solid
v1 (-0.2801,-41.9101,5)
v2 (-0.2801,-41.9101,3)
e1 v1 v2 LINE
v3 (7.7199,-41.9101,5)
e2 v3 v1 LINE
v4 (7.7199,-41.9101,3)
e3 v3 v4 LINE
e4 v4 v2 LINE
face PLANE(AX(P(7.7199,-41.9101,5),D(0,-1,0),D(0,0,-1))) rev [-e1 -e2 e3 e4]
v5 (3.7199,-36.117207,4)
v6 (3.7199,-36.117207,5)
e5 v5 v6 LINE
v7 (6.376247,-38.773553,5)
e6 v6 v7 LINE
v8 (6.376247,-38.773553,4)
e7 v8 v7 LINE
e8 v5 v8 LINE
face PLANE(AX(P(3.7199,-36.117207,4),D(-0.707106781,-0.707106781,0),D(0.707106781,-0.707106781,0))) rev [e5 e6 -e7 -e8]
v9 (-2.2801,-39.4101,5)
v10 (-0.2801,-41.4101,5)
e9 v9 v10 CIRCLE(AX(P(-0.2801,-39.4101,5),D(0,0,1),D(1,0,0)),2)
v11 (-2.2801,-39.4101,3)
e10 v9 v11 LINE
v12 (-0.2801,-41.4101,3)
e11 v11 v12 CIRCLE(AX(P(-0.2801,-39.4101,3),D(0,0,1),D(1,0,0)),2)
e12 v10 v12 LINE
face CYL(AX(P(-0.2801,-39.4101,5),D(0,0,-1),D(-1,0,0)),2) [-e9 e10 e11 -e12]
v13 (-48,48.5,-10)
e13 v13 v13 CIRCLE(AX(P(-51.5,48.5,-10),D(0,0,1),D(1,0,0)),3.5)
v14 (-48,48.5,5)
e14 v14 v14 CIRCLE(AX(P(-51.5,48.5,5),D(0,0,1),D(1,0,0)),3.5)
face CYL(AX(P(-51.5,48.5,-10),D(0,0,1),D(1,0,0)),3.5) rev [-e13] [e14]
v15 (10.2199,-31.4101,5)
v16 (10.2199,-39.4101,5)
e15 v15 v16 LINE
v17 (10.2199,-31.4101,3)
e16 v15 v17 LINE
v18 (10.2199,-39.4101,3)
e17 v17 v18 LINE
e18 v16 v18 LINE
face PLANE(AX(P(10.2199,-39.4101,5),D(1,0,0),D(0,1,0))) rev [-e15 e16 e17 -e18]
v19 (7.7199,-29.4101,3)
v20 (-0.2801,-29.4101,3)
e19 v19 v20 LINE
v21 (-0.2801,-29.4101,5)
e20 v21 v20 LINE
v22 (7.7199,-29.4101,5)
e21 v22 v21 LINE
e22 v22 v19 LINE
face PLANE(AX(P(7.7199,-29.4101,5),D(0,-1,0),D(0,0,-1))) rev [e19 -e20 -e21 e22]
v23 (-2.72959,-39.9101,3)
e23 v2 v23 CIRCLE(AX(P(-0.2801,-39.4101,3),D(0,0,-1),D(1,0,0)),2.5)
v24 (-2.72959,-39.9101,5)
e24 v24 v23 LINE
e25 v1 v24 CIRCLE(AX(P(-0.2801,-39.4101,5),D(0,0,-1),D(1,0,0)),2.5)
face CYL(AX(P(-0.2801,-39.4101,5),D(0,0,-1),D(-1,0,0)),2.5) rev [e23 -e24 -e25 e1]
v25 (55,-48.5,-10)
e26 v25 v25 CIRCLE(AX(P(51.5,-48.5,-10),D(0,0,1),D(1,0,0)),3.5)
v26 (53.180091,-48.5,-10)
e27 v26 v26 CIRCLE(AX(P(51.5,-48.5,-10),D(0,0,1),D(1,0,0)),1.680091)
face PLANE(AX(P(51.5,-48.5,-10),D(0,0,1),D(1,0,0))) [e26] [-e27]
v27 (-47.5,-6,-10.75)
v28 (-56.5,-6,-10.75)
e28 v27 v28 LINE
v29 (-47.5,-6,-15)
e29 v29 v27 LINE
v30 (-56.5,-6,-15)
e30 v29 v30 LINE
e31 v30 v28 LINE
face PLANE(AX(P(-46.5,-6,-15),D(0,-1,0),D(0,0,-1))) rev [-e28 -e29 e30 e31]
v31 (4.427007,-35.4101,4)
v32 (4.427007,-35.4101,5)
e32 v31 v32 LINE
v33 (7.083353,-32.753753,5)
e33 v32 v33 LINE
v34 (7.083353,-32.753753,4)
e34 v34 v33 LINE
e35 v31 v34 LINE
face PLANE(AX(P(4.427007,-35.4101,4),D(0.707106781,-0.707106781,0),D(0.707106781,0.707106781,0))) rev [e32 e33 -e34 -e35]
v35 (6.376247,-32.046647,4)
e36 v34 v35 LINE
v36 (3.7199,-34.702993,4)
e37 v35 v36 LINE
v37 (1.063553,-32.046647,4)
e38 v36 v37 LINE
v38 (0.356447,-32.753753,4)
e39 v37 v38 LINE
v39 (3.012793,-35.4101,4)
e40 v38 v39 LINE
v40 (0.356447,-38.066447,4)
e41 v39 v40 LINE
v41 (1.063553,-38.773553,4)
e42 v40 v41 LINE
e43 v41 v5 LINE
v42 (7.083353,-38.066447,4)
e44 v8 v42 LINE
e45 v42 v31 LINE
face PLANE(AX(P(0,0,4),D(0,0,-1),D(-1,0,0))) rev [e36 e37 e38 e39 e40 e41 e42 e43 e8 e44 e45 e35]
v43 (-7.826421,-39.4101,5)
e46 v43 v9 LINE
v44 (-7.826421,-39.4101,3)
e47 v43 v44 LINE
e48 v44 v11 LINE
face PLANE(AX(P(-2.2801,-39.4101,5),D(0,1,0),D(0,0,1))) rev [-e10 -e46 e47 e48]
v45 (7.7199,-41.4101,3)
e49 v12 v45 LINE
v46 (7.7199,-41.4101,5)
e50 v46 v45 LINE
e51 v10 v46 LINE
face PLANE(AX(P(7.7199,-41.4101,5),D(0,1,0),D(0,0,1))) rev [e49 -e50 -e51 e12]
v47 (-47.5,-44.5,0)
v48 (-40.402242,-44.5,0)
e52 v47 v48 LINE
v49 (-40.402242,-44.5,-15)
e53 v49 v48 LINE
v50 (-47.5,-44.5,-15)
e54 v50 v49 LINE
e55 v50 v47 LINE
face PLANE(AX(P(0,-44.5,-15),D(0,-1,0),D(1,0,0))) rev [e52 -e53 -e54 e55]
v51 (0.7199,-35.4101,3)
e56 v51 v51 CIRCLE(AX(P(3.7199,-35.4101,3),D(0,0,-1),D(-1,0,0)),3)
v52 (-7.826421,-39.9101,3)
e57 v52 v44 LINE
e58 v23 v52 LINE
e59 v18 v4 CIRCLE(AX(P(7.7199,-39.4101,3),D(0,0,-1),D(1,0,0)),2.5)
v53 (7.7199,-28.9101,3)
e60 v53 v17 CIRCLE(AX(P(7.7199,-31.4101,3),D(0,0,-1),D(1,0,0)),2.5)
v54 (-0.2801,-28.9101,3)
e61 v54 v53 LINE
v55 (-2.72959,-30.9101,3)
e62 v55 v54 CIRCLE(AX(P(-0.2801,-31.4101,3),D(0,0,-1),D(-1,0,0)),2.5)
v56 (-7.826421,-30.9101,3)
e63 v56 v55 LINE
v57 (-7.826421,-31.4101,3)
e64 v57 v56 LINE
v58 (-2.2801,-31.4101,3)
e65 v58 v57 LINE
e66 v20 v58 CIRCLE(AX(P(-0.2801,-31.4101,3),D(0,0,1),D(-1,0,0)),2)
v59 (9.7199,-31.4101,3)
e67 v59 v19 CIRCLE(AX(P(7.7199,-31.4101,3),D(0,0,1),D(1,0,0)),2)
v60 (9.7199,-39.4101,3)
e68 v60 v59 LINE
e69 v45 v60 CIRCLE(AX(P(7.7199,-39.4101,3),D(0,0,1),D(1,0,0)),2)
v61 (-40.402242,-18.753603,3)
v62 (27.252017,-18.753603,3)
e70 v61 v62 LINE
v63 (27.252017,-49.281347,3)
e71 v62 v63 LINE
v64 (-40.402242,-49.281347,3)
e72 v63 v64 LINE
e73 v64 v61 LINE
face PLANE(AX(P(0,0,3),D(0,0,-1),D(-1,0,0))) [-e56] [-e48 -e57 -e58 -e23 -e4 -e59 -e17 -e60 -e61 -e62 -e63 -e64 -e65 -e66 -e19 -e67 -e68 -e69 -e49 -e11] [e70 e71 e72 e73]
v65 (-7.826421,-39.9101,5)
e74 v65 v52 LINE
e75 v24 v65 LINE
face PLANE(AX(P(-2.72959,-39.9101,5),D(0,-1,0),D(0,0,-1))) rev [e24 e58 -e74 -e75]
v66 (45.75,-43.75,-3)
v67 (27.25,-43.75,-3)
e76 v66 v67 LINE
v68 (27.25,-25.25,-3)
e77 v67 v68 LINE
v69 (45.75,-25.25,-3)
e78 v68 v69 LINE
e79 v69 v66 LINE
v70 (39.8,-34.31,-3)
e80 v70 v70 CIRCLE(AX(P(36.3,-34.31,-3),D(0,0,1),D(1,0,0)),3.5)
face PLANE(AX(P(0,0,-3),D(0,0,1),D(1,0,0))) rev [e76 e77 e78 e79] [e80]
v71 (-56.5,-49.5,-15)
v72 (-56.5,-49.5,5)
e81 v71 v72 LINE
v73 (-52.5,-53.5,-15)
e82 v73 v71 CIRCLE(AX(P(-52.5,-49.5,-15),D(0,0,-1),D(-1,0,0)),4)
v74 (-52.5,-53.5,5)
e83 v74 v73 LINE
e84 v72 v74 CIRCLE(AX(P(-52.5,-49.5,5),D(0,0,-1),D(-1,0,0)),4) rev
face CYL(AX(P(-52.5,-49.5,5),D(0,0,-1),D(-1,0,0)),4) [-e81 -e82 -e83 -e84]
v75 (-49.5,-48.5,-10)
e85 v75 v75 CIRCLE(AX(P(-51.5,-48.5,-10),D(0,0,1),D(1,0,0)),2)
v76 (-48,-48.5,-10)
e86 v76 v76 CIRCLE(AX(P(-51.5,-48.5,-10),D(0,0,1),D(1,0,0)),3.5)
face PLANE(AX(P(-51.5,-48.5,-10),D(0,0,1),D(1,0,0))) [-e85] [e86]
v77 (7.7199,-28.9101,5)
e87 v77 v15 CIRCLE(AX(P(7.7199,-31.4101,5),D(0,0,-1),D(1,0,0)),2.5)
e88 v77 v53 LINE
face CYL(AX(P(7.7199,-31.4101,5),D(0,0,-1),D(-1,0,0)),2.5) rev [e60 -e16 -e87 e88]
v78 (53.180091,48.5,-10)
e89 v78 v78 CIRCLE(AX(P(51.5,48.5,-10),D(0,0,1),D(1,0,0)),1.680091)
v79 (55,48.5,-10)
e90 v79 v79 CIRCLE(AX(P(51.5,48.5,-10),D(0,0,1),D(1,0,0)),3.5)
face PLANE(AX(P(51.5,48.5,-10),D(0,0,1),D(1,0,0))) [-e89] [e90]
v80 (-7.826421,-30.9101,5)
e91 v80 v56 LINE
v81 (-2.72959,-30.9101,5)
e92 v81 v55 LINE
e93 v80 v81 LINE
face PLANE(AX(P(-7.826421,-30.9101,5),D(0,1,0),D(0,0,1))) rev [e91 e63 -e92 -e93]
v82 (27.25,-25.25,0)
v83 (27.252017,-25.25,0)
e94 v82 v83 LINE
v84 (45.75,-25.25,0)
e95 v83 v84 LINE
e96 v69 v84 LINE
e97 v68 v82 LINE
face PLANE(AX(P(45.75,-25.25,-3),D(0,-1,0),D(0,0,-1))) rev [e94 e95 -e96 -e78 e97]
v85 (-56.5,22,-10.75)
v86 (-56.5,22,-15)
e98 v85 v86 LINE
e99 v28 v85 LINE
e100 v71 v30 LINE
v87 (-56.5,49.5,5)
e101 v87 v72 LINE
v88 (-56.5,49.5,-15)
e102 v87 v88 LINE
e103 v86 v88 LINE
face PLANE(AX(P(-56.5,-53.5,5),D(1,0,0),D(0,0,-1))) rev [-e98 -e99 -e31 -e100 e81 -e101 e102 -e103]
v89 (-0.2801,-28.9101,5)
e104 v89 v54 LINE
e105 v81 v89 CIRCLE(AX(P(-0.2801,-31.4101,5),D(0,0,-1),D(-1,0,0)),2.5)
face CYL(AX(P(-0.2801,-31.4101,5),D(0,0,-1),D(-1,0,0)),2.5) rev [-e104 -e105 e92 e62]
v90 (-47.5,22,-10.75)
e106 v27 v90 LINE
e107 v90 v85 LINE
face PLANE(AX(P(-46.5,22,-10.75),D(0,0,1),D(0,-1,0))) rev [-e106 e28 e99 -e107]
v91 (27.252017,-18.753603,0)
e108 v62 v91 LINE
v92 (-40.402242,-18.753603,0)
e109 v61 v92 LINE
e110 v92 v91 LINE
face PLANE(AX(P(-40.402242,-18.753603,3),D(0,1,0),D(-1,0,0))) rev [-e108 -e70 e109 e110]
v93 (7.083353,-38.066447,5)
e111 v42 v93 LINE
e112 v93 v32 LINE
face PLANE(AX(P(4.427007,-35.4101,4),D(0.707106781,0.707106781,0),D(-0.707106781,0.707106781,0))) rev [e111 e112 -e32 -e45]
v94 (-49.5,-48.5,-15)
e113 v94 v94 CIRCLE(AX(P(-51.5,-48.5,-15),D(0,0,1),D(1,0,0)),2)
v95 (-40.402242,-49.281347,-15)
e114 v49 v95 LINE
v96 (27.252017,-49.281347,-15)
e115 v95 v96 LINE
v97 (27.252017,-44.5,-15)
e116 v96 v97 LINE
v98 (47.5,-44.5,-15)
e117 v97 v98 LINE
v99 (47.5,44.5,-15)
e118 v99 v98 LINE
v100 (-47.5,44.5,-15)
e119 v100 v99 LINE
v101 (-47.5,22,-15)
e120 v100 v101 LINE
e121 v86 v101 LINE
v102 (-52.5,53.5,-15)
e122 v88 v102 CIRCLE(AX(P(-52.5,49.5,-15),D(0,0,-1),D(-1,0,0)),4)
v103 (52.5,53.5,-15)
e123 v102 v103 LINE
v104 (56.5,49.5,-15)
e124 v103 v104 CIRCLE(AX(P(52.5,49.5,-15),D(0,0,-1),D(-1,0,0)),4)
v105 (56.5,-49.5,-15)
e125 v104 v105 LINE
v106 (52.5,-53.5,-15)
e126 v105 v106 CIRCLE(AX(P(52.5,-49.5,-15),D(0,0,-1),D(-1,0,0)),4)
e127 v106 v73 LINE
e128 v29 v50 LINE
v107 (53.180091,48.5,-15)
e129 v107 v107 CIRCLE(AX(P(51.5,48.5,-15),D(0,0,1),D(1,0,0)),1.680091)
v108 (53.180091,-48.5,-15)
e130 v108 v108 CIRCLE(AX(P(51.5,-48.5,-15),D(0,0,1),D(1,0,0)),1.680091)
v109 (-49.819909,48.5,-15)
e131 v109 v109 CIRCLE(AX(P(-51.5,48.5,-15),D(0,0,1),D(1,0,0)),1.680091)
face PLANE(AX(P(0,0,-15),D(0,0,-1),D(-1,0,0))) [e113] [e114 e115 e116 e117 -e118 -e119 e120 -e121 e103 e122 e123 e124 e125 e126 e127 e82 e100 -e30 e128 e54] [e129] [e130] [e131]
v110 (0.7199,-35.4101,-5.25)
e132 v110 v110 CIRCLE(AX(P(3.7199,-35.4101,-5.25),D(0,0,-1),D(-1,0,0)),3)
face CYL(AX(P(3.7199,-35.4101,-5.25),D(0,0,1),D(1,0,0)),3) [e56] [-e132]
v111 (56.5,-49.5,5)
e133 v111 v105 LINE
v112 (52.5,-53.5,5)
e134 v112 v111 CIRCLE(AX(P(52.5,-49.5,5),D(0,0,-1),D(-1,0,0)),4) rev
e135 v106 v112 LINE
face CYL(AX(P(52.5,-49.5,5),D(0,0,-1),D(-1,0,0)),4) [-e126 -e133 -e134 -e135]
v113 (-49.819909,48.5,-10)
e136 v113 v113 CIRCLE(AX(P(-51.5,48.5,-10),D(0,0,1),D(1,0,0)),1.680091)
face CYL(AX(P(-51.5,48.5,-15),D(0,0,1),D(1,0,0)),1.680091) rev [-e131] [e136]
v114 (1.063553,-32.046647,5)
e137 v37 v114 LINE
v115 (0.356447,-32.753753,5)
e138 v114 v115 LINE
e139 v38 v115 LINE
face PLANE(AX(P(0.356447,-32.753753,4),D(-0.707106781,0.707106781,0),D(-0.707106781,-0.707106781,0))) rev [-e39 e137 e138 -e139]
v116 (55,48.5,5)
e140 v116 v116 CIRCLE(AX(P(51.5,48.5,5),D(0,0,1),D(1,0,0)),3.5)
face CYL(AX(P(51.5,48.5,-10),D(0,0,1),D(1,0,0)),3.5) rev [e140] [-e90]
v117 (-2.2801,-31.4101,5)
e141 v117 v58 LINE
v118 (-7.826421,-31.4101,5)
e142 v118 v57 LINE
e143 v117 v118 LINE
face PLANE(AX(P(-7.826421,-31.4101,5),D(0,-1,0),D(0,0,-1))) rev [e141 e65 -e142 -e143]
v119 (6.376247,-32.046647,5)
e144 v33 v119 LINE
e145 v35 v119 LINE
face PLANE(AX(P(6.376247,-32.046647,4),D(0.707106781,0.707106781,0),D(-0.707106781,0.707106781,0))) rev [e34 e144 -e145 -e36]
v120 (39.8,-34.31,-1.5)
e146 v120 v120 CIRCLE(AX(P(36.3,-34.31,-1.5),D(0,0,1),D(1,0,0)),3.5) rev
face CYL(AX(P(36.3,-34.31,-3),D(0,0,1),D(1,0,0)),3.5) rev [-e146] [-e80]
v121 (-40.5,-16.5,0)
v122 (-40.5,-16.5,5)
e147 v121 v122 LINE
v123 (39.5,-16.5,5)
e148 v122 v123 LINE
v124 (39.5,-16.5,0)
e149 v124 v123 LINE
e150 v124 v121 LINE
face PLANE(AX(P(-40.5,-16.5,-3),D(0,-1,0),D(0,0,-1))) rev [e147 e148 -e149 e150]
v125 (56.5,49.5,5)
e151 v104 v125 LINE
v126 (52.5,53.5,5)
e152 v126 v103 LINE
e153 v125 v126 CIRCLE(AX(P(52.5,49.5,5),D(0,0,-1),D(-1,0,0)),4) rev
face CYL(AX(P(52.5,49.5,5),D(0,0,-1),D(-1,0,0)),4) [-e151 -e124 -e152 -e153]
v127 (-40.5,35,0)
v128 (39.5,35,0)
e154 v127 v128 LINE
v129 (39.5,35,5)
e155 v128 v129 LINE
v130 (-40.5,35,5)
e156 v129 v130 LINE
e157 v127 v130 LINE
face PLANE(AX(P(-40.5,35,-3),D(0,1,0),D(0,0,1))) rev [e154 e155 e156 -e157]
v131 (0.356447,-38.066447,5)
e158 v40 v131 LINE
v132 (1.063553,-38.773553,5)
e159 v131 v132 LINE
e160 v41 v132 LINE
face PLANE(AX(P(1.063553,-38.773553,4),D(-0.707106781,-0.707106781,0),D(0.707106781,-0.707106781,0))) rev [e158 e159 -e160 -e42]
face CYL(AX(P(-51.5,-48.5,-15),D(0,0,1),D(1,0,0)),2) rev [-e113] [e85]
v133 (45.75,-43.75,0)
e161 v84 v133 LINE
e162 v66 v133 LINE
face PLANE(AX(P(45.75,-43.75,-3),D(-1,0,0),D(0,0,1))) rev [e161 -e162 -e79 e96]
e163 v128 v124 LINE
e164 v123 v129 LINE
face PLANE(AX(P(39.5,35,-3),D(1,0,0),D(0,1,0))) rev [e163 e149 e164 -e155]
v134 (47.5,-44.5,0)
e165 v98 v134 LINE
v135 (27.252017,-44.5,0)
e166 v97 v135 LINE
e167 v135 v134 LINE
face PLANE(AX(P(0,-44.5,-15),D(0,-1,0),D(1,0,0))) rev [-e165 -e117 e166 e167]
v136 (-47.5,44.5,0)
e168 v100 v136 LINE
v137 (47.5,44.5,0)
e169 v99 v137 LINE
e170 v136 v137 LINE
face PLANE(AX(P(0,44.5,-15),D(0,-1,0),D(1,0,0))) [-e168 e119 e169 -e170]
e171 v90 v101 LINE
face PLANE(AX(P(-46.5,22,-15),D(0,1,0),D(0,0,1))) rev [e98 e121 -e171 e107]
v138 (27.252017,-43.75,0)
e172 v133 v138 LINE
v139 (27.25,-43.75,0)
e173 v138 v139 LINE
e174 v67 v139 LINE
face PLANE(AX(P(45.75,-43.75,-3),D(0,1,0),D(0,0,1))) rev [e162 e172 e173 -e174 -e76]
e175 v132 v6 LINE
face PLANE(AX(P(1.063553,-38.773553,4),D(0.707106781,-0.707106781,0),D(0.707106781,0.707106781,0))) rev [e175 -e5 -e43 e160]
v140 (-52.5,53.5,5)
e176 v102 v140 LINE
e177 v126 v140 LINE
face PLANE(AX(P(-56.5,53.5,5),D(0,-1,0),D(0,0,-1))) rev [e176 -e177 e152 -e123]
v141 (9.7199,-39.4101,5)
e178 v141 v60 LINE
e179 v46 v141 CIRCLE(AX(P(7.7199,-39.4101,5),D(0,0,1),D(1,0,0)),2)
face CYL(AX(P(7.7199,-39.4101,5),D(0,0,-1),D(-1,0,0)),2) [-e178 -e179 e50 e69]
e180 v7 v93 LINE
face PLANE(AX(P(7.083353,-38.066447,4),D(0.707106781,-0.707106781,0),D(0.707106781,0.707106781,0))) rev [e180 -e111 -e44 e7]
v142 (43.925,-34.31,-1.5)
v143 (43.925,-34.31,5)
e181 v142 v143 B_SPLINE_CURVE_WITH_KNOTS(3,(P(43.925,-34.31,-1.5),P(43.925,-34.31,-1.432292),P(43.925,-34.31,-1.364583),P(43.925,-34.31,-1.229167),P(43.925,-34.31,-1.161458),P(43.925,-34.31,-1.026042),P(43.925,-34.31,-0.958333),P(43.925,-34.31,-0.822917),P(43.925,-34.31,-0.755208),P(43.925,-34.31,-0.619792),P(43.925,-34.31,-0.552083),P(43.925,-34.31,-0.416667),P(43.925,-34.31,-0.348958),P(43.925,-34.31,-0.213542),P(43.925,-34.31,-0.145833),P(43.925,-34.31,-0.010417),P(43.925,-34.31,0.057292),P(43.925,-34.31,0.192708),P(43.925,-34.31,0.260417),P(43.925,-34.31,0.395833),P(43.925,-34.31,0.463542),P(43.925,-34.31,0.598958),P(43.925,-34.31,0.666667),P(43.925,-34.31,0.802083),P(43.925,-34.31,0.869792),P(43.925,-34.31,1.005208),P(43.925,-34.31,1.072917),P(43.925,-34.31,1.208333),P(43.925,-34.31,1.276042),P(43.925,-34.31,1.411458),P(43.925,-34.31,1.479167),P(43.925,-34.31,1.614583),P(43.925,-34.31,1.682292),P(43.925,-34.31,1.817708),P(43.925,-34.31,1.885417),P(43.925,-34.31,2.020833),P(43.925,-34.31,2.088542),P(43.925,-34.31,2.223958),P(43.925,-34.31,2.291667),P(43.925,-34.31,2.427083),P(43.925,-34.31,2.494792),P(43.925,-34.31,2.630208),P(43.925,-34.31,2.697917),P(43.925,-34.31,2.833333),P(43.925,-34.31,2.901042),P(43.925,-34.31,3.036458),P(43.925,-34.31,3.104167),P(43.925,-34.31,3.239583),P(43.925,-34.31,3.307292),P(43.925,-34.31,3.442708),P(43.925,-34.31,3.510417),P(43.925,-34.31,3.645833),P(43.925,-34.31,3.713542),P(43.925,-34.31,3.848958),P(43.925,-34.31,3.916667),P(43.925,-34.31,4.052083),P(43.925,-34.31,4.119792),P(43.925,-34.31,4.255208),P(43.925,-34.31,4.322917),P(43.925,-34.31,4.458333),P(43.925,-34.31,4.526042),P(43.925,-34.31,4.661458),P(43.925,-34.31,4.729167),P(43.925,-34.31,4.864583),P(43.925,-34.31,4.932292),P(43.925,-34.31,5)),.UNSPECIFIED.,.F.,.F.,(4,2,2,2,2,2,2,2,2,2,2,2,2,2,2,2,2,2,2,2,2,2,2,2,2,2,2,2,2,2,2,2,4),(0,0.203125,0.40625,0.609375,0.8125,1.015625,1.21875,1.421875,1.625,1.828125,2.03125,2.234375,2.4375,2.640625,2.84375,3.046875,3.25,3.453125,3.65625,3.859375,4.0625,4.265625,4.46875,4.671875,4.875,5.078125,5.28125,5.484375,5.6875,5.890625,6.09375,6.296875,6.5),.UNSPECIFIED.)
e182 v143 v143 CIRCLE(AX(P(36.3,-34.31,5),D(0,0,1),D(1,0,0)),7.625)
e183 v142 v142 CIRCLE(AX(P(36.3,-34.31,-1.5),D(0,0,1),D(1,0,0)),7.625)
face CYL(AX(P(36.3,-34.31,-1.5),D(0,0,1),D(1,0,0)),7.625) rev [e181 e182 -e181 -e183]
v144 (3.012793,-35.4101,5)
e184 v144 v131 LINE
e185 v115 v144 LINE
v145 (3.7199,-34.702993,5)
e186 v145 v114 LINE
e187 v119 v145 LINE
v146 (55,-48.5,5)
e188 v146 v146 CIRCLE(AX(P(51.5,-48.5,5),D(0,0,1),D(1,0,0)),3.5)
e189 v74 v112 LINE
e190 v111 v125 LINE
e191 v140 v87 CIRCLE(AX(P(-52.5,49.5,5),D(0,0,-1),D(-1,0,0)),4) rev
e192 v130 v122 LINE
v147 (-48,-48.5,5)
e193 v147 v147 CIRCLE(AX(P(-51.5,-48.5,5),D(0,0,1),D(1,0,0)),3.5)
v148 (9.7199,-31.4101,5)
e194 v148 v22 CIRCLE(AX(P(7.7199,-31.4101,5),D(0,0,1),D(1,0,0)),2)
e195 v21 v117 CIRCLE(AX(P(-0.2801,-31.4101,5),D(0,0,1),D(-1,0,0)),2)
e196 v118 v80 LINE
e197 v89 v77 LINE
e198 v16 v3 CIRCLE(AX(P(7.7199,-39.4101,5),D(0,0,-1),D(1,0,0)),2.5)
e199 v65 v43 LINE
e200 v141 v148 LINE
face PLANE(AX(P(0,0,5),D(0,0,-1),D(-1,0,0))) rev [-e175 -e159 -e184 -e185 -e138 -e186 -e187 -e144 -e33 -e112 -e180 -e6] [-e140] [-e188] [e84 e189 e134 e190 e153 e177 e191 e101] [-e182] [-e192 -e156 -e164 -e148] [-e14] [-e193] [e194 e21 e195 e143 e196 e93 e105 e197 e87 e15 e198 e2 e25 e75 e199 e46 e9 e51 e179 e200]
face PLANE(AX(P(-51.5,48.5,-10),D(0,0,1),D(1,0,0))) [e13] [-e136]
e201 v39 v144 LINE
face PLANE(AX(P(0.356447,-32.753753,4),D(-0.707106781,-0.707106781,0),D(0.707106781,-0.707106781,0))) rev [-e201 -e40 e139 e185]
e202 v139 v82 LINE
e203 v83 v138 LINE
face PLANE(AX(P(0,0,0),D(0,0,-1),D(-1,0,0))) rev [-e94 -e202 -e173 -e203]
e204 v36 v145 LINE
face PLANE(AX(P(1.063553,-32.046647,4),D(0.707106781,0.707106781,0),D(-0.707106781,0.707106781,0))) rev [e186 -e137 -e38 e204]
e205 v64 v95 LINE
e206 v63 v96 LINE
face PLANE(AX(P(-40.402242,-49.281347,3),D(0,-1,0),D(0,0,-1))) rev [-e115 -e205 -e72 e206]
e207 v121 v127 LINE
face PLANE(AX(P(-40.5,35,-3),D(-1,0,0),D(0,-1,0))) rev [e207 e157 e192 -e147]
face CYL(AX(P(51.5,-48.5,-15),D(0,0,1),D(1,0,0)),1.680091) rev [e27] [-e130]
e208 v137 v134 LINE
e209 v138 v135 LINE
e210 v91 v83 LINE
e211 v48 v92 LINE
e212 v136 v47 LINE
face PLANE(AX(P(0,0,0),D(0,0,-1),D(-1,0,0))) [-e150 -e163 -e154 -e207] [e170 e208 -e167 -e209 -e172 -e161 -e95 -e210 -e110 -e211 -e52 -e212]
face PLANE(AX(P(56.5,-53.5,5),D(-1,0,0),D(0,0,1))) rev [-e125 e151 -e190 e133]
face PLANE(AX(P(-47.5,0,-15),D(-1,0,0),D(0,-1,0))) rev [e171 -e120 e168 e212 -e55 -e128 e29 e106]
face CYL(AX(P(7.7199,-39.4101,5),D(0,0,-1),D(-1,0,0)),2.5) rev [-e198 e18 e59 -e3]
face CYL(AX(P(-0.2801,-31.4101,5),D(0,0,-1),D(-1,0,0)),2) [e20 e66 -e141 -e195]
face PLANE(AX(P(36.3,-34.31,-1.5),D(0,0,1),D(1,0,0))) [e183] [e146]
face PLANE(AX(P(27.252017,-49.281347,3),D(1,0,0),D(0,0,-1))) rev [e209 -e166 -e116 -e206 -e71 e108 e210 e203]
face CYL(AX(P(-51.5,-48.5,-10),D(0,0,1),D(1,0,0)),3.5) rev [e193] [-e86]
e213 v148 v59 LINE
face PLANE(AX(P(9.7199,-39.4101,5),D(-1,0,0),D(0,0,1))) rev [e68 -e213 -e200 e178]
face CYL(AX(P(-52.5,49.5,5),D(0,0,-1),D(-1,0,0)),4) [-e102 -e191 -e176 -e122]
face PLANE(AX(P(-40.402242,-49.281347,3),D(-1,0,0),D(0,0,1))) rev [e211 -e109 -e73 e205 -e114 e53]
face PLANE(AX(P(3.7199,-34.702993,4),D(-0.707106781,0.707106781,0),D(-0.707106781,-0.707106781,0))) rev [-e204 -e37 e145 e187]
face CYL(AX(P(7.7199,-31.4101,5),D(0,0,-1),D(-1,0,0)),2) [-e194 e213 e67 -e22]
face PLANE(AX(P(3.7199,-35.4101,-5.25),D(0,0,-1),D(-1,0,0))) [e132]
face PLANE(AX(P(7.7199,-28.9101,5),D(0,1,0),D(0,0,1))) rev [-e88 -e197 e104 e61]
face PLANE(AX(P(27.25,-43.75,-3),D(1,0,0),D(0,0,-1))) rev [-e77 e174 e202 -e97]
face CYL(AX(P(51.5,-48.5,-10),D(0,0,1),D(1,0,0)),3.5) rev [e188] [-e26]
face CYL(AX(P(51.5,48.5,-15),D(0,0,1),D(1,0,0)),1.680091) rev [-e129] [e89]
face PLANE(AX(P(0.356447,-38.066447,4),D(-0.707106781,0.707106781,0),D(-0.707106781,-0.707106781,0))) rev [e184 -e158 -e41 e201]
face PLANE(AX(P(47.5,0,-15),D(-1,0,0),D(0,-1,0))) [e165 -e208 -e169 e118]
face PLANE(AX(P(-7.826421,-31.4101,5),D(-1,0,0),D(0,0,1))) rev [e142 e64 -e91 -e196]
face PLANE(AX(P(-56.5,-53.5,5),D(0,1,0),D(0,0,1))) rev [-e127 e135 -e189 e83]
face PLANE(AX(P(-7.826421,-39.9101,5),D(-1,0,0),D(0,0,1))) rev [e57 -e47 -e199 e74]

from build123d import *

# Parameters (mm, degrees)
SKETCH1_W                        = 113
SKETCH1_H                        = 107
MAIN_BODY_DEPTH                  = 5
SKETCH19_W                       = 18.5
SKETCH19_H                       = 18.5
BOSS_EXTRUDE1_DEPTH              = 3
SKETCH7_R                        = 3.5
SKETCH7_W                        = 80
SKETCH7_H                        = 51.5
SCREEN_AND_KNOB_LOCATATION_DEPTH = 79.220841213
SKETCH11_W                       = 67.654258951
SKETCH11_H                       = 30.527744354
INTERNAL_CAVITY_DEPTH            = 3
BOARDERS_DEPTH                   = 15
SKETCH6_R                        = 3.5
SCREW_HEAD_PLACEMENT_DEPTH       = 15
SKETCH10_R                       = 1.68009103
SKETCH10_R_2                     = 2
SCREW_HOLE_THROUGH_DEPTH         = 80.243296246
SKETCH14_W                       = 4.25
SKETCH14_H                       = 28
SD_CARD_SLOT_DEPTH               = 10
SKETCH15_R                       = 3
BUTTON_PRESS_DEPTH               = 8.25
GROOVE_CUT_DEPTH                 = 80.865511956
CANCEL_DECAL_DEPTH               = 1
MAIN_BODY_FILLET_R               = 4
SKETCH18_R                       = 7.625
CUT_EXTRUDE1_DEPTH               = 6.5


with BuildPart() as part:
    # Sketch1 → Main Body (new body)
    with BuildSketch(Plane.XY):
        Rectangle(SKETCH1_W, SKETCH1_H)
    extrude(amount=MAIN_BODY_DEPTH)

    # Sketch19 → Boss-Extrude1 (add)
    with BuildSketch(Plane(origin=(0, 0, 0), x_dir=(-1, 0, 0), z_dir=(0, 0, -1))):
        with Locations((-36.5, -34.5)):
            Rectangle(SKETCH19_W, SKETCH19_H)
    extrude(amount=BOSS_EXTRUDE1_DEPTH)

    # Sketch7 → Screen and knob locatation (cut, through all)
    with BuildSketch(Plane.XY.offset(5)):
        with Locations((36.3, -34.31)):
            Circle(SKETCH7_R)
        with Locations((-0.5, 9.25)):
            Rectangle(SKETCH7_W, SKETCH7_H)
    extrude(amount=-SCREEN_AND_KNOB_LOCATATION_DEPTH, mode=Mode.SUBTRACT)

    # Sketch11 → Internal cavity (cut)
    with BuildSketch(Plane(origin=(0, 0, 0), x_dir=(-1, 0, 0), z_dir=(0, 0, -1))):
        with Locations((6.575112586, -34.017474747)):
            Rectangle(SKETCH11_W, SKETCH11_H)
    extrude(amount=-INTERNAL_CAVITY_DEPTH, mode=Mode.SUBTRACT)

    # Sketch12 → Boarders (add)
    with BuildSketch(Plane(origin=(0, 0, 0), x_dir=(-1, 0, 0), z_dir=(0, 0, -1))):
        Polygon((56.5, 43.5), (56.5, 53.5), (46.5, 53.5), (-46.5, 53.5), (-56.5, 53.5), (-56.5, 43.5), (-56.5, -43.5), (-56.5, -53.5), (-46.5, -53.5), (46.5, -53.5), (56.5, -53.5), (56.5, -43.5), align=None)
        Polygon((-47.5, 44.5), (47.5, 44.5), (47.5, -44.5), (40.402242061, -44.5), (40.402242061, -49.281346924), (-27.25201689, -49.281346924), (-27.25201689, -44.5), (-47.5, -44.5), align=None, mode=Mode.SUBTRACT)
    extrude(amount=BOARDERS_DEPTH)

    # Sketch6 → Screw Head Placement (cut)
    with BuildSketch(Plane.XY.offset(5)):
        with Locations((-51.5, 48.5)):
            Circle(SKETCH6_R)
        with Locations((-51.5, -48.5)):
            Circle(SKETCH6_R)
        with Locations((51.5, -48.5)):
            Circle(SKETCH6_R)
        with Locations((51.5, 48.5)):
            Circle(SKETCH6_R)
    extrude(amount=-SCREW_HEAD_PLACEMENT_DEPTH, mode=Mode.SUBTRACT)

    # Sketch10 → Screw hole through (cut, through all)
    with BuildSketch(Plane.XY.offset(-10)):
        with Locations((-51.5, 48.5)):
            Circle(SKETCH10_R)
        with Locations((51.5, 48.5)):
            Circle(SKETCH10_R)
        with Locations((51.5, -48.5)):
            Circle(SKETCH10_R)
        with Locations((-51.5, -48.5)):
            Circle(SKETCH10_R_2)
    extrude(amount=-SCREW_HOLE_THROUGH_DEPTH, mode=Mode.SUBTRACT)

    # Sketch14 → SD Card Slot (cut)
    with BuildSketch(Plane.ZY.offset(56.5)):
        with Locations((-12.875, 8)):
            Rectangle(SKETCH14_W, SKETCH14_H)
    extrude(amount=-SD_CARD_SLOT_DEPTH, mode=Mode.SUBTRACT)

    # Sketch15 → Button Press (add)
    with BuildSketch(Plane(origin=(0, 0, 3), x_dir=(-1, 0, 0), z_dir=(0, 0, -1))):
        with Locations((-3.7199, -35.4101)):
            Circle(SKETCH15_R)
    extrude(amount=BUTTON_PRESS_DEPTH)

    # Sketch16 → Groove Cut (cut, through all)
    with BuildSketch(Plane(origin=(0, 0, 3), x_dir=(-1, 0, 0), z_dir=(0, 0, -1))):
        with BuildLine():
            Line((2.2801, -39.4101), (7.826420717, -39.4101))
            Line((7.826420717, -39.4101), (7.826420717, -39.9101))
            Line((7.826420717, -39.9101), (2.729589743, -39.9101))
            ThreePointArc((2.729589743, -39.9101), (1.86123883, -41.346591673), (0.2801, -41.9101))
            Line((0.2801, -41.9101), (-7.7199, -41.9101))
            ThreePointArc((-7.7199, -41.9101), (-9.487666953, -41.177866953), (-10.2199, -39.4101))
            Line((-10.2199, -39.4101), (-10.2199, -31.4101))
            ThreePointArc((-10.2199, -31.4101), (-9.487666953, -29.642333047), (-7.7199, -28.9101))
            Line((-7.7199, -28.9101), (0.2801, -28.9101))
            ThreePointArc((0.2801, -28.9101), (1.86123883, -29.473608327), (2.729589743, -30.9101))
            Line((2.729589743, -30.9101), (7.826420717, -30.9101))
            Line((7.826420717, -30.9101), (7.826420717, -31.4101))
            Line((7.826420717, -31.4101), (2.2801, -31.4101))
            ThreePointArc((2.2801, -31.4101), (1.694313562, -29.995886438), (0.2801, -29.4101))
            Line((0.2801, -29.4101), (-7.7199, -29.4101))
            ThreePointArc((-7.7199, -29.4101), (-9.134113562, -29.995886438), (-9.7199, -31.4101))
            Line((-9.7199, -31.4101), (-9.7199, -39.4101))
            ThreePointArc((-9.7199, -39.4101), (-9.134113562, -40.824313562), (-7.7199, -41.4101))
            Line((-7.7199, -41.4101), (0.2801, -41.4101))
            ThreePointArc((0.2801, -41.4101), (1.694313562, -40.824313562), (2.2801, -39.4101))
        make_face()
    extrude(amount=-GROOVE_CUT_DEPTH, mode=Mode.SUBTRACT)

    # Sketch17 → CAncel Decal (cut)
    with BuildSketch(Plane.XY.offset(5)):
        Polygon((0.356446609, -32.753753391), (3.012793219, -35.4101), (0.356446609, -38.066446609), (1.063553391, -38.773553391), (3.7199, -36.117206781), (6.376246609, -38.773553391), (7.083353391, -38.066446609), (4.427006781, -35.4101), (7.083353391, -32.753753391), (6.376246609, -32.046646609), (3.7199, -34.702993219), (1.063553391, -32.046646609), align=None)
    extrude(amount=-CANCEL_DECAL_DEPTH, mode=Mode.SUBTRACT)

    # Main Body Fillet
    main_body_fillet_edges = [part.edges().sort_by_distance(p)[0] for p in [
        (-56.5, -53.5, -5),
        (56.5, -53.5, -5),
        (56.5, 53.5, -5),
        (-56.5, 53.5, -5),
    ]]
    fillet(main_body_fillet_edges, radius=MAIN_BODY_FILLET_R)

    # Sketch18 → Cut-Extrude1 (cut)
    with BuildSketch(Plane.XY.offset(5)):
        with Locations((36.3, -34.31)):
            Circle(SKETCH18_R)
    extrude(amount=-CUT_EXTRUDE1_DEPTH, mode=Mode.SUBTRACT)


solid = part.part
